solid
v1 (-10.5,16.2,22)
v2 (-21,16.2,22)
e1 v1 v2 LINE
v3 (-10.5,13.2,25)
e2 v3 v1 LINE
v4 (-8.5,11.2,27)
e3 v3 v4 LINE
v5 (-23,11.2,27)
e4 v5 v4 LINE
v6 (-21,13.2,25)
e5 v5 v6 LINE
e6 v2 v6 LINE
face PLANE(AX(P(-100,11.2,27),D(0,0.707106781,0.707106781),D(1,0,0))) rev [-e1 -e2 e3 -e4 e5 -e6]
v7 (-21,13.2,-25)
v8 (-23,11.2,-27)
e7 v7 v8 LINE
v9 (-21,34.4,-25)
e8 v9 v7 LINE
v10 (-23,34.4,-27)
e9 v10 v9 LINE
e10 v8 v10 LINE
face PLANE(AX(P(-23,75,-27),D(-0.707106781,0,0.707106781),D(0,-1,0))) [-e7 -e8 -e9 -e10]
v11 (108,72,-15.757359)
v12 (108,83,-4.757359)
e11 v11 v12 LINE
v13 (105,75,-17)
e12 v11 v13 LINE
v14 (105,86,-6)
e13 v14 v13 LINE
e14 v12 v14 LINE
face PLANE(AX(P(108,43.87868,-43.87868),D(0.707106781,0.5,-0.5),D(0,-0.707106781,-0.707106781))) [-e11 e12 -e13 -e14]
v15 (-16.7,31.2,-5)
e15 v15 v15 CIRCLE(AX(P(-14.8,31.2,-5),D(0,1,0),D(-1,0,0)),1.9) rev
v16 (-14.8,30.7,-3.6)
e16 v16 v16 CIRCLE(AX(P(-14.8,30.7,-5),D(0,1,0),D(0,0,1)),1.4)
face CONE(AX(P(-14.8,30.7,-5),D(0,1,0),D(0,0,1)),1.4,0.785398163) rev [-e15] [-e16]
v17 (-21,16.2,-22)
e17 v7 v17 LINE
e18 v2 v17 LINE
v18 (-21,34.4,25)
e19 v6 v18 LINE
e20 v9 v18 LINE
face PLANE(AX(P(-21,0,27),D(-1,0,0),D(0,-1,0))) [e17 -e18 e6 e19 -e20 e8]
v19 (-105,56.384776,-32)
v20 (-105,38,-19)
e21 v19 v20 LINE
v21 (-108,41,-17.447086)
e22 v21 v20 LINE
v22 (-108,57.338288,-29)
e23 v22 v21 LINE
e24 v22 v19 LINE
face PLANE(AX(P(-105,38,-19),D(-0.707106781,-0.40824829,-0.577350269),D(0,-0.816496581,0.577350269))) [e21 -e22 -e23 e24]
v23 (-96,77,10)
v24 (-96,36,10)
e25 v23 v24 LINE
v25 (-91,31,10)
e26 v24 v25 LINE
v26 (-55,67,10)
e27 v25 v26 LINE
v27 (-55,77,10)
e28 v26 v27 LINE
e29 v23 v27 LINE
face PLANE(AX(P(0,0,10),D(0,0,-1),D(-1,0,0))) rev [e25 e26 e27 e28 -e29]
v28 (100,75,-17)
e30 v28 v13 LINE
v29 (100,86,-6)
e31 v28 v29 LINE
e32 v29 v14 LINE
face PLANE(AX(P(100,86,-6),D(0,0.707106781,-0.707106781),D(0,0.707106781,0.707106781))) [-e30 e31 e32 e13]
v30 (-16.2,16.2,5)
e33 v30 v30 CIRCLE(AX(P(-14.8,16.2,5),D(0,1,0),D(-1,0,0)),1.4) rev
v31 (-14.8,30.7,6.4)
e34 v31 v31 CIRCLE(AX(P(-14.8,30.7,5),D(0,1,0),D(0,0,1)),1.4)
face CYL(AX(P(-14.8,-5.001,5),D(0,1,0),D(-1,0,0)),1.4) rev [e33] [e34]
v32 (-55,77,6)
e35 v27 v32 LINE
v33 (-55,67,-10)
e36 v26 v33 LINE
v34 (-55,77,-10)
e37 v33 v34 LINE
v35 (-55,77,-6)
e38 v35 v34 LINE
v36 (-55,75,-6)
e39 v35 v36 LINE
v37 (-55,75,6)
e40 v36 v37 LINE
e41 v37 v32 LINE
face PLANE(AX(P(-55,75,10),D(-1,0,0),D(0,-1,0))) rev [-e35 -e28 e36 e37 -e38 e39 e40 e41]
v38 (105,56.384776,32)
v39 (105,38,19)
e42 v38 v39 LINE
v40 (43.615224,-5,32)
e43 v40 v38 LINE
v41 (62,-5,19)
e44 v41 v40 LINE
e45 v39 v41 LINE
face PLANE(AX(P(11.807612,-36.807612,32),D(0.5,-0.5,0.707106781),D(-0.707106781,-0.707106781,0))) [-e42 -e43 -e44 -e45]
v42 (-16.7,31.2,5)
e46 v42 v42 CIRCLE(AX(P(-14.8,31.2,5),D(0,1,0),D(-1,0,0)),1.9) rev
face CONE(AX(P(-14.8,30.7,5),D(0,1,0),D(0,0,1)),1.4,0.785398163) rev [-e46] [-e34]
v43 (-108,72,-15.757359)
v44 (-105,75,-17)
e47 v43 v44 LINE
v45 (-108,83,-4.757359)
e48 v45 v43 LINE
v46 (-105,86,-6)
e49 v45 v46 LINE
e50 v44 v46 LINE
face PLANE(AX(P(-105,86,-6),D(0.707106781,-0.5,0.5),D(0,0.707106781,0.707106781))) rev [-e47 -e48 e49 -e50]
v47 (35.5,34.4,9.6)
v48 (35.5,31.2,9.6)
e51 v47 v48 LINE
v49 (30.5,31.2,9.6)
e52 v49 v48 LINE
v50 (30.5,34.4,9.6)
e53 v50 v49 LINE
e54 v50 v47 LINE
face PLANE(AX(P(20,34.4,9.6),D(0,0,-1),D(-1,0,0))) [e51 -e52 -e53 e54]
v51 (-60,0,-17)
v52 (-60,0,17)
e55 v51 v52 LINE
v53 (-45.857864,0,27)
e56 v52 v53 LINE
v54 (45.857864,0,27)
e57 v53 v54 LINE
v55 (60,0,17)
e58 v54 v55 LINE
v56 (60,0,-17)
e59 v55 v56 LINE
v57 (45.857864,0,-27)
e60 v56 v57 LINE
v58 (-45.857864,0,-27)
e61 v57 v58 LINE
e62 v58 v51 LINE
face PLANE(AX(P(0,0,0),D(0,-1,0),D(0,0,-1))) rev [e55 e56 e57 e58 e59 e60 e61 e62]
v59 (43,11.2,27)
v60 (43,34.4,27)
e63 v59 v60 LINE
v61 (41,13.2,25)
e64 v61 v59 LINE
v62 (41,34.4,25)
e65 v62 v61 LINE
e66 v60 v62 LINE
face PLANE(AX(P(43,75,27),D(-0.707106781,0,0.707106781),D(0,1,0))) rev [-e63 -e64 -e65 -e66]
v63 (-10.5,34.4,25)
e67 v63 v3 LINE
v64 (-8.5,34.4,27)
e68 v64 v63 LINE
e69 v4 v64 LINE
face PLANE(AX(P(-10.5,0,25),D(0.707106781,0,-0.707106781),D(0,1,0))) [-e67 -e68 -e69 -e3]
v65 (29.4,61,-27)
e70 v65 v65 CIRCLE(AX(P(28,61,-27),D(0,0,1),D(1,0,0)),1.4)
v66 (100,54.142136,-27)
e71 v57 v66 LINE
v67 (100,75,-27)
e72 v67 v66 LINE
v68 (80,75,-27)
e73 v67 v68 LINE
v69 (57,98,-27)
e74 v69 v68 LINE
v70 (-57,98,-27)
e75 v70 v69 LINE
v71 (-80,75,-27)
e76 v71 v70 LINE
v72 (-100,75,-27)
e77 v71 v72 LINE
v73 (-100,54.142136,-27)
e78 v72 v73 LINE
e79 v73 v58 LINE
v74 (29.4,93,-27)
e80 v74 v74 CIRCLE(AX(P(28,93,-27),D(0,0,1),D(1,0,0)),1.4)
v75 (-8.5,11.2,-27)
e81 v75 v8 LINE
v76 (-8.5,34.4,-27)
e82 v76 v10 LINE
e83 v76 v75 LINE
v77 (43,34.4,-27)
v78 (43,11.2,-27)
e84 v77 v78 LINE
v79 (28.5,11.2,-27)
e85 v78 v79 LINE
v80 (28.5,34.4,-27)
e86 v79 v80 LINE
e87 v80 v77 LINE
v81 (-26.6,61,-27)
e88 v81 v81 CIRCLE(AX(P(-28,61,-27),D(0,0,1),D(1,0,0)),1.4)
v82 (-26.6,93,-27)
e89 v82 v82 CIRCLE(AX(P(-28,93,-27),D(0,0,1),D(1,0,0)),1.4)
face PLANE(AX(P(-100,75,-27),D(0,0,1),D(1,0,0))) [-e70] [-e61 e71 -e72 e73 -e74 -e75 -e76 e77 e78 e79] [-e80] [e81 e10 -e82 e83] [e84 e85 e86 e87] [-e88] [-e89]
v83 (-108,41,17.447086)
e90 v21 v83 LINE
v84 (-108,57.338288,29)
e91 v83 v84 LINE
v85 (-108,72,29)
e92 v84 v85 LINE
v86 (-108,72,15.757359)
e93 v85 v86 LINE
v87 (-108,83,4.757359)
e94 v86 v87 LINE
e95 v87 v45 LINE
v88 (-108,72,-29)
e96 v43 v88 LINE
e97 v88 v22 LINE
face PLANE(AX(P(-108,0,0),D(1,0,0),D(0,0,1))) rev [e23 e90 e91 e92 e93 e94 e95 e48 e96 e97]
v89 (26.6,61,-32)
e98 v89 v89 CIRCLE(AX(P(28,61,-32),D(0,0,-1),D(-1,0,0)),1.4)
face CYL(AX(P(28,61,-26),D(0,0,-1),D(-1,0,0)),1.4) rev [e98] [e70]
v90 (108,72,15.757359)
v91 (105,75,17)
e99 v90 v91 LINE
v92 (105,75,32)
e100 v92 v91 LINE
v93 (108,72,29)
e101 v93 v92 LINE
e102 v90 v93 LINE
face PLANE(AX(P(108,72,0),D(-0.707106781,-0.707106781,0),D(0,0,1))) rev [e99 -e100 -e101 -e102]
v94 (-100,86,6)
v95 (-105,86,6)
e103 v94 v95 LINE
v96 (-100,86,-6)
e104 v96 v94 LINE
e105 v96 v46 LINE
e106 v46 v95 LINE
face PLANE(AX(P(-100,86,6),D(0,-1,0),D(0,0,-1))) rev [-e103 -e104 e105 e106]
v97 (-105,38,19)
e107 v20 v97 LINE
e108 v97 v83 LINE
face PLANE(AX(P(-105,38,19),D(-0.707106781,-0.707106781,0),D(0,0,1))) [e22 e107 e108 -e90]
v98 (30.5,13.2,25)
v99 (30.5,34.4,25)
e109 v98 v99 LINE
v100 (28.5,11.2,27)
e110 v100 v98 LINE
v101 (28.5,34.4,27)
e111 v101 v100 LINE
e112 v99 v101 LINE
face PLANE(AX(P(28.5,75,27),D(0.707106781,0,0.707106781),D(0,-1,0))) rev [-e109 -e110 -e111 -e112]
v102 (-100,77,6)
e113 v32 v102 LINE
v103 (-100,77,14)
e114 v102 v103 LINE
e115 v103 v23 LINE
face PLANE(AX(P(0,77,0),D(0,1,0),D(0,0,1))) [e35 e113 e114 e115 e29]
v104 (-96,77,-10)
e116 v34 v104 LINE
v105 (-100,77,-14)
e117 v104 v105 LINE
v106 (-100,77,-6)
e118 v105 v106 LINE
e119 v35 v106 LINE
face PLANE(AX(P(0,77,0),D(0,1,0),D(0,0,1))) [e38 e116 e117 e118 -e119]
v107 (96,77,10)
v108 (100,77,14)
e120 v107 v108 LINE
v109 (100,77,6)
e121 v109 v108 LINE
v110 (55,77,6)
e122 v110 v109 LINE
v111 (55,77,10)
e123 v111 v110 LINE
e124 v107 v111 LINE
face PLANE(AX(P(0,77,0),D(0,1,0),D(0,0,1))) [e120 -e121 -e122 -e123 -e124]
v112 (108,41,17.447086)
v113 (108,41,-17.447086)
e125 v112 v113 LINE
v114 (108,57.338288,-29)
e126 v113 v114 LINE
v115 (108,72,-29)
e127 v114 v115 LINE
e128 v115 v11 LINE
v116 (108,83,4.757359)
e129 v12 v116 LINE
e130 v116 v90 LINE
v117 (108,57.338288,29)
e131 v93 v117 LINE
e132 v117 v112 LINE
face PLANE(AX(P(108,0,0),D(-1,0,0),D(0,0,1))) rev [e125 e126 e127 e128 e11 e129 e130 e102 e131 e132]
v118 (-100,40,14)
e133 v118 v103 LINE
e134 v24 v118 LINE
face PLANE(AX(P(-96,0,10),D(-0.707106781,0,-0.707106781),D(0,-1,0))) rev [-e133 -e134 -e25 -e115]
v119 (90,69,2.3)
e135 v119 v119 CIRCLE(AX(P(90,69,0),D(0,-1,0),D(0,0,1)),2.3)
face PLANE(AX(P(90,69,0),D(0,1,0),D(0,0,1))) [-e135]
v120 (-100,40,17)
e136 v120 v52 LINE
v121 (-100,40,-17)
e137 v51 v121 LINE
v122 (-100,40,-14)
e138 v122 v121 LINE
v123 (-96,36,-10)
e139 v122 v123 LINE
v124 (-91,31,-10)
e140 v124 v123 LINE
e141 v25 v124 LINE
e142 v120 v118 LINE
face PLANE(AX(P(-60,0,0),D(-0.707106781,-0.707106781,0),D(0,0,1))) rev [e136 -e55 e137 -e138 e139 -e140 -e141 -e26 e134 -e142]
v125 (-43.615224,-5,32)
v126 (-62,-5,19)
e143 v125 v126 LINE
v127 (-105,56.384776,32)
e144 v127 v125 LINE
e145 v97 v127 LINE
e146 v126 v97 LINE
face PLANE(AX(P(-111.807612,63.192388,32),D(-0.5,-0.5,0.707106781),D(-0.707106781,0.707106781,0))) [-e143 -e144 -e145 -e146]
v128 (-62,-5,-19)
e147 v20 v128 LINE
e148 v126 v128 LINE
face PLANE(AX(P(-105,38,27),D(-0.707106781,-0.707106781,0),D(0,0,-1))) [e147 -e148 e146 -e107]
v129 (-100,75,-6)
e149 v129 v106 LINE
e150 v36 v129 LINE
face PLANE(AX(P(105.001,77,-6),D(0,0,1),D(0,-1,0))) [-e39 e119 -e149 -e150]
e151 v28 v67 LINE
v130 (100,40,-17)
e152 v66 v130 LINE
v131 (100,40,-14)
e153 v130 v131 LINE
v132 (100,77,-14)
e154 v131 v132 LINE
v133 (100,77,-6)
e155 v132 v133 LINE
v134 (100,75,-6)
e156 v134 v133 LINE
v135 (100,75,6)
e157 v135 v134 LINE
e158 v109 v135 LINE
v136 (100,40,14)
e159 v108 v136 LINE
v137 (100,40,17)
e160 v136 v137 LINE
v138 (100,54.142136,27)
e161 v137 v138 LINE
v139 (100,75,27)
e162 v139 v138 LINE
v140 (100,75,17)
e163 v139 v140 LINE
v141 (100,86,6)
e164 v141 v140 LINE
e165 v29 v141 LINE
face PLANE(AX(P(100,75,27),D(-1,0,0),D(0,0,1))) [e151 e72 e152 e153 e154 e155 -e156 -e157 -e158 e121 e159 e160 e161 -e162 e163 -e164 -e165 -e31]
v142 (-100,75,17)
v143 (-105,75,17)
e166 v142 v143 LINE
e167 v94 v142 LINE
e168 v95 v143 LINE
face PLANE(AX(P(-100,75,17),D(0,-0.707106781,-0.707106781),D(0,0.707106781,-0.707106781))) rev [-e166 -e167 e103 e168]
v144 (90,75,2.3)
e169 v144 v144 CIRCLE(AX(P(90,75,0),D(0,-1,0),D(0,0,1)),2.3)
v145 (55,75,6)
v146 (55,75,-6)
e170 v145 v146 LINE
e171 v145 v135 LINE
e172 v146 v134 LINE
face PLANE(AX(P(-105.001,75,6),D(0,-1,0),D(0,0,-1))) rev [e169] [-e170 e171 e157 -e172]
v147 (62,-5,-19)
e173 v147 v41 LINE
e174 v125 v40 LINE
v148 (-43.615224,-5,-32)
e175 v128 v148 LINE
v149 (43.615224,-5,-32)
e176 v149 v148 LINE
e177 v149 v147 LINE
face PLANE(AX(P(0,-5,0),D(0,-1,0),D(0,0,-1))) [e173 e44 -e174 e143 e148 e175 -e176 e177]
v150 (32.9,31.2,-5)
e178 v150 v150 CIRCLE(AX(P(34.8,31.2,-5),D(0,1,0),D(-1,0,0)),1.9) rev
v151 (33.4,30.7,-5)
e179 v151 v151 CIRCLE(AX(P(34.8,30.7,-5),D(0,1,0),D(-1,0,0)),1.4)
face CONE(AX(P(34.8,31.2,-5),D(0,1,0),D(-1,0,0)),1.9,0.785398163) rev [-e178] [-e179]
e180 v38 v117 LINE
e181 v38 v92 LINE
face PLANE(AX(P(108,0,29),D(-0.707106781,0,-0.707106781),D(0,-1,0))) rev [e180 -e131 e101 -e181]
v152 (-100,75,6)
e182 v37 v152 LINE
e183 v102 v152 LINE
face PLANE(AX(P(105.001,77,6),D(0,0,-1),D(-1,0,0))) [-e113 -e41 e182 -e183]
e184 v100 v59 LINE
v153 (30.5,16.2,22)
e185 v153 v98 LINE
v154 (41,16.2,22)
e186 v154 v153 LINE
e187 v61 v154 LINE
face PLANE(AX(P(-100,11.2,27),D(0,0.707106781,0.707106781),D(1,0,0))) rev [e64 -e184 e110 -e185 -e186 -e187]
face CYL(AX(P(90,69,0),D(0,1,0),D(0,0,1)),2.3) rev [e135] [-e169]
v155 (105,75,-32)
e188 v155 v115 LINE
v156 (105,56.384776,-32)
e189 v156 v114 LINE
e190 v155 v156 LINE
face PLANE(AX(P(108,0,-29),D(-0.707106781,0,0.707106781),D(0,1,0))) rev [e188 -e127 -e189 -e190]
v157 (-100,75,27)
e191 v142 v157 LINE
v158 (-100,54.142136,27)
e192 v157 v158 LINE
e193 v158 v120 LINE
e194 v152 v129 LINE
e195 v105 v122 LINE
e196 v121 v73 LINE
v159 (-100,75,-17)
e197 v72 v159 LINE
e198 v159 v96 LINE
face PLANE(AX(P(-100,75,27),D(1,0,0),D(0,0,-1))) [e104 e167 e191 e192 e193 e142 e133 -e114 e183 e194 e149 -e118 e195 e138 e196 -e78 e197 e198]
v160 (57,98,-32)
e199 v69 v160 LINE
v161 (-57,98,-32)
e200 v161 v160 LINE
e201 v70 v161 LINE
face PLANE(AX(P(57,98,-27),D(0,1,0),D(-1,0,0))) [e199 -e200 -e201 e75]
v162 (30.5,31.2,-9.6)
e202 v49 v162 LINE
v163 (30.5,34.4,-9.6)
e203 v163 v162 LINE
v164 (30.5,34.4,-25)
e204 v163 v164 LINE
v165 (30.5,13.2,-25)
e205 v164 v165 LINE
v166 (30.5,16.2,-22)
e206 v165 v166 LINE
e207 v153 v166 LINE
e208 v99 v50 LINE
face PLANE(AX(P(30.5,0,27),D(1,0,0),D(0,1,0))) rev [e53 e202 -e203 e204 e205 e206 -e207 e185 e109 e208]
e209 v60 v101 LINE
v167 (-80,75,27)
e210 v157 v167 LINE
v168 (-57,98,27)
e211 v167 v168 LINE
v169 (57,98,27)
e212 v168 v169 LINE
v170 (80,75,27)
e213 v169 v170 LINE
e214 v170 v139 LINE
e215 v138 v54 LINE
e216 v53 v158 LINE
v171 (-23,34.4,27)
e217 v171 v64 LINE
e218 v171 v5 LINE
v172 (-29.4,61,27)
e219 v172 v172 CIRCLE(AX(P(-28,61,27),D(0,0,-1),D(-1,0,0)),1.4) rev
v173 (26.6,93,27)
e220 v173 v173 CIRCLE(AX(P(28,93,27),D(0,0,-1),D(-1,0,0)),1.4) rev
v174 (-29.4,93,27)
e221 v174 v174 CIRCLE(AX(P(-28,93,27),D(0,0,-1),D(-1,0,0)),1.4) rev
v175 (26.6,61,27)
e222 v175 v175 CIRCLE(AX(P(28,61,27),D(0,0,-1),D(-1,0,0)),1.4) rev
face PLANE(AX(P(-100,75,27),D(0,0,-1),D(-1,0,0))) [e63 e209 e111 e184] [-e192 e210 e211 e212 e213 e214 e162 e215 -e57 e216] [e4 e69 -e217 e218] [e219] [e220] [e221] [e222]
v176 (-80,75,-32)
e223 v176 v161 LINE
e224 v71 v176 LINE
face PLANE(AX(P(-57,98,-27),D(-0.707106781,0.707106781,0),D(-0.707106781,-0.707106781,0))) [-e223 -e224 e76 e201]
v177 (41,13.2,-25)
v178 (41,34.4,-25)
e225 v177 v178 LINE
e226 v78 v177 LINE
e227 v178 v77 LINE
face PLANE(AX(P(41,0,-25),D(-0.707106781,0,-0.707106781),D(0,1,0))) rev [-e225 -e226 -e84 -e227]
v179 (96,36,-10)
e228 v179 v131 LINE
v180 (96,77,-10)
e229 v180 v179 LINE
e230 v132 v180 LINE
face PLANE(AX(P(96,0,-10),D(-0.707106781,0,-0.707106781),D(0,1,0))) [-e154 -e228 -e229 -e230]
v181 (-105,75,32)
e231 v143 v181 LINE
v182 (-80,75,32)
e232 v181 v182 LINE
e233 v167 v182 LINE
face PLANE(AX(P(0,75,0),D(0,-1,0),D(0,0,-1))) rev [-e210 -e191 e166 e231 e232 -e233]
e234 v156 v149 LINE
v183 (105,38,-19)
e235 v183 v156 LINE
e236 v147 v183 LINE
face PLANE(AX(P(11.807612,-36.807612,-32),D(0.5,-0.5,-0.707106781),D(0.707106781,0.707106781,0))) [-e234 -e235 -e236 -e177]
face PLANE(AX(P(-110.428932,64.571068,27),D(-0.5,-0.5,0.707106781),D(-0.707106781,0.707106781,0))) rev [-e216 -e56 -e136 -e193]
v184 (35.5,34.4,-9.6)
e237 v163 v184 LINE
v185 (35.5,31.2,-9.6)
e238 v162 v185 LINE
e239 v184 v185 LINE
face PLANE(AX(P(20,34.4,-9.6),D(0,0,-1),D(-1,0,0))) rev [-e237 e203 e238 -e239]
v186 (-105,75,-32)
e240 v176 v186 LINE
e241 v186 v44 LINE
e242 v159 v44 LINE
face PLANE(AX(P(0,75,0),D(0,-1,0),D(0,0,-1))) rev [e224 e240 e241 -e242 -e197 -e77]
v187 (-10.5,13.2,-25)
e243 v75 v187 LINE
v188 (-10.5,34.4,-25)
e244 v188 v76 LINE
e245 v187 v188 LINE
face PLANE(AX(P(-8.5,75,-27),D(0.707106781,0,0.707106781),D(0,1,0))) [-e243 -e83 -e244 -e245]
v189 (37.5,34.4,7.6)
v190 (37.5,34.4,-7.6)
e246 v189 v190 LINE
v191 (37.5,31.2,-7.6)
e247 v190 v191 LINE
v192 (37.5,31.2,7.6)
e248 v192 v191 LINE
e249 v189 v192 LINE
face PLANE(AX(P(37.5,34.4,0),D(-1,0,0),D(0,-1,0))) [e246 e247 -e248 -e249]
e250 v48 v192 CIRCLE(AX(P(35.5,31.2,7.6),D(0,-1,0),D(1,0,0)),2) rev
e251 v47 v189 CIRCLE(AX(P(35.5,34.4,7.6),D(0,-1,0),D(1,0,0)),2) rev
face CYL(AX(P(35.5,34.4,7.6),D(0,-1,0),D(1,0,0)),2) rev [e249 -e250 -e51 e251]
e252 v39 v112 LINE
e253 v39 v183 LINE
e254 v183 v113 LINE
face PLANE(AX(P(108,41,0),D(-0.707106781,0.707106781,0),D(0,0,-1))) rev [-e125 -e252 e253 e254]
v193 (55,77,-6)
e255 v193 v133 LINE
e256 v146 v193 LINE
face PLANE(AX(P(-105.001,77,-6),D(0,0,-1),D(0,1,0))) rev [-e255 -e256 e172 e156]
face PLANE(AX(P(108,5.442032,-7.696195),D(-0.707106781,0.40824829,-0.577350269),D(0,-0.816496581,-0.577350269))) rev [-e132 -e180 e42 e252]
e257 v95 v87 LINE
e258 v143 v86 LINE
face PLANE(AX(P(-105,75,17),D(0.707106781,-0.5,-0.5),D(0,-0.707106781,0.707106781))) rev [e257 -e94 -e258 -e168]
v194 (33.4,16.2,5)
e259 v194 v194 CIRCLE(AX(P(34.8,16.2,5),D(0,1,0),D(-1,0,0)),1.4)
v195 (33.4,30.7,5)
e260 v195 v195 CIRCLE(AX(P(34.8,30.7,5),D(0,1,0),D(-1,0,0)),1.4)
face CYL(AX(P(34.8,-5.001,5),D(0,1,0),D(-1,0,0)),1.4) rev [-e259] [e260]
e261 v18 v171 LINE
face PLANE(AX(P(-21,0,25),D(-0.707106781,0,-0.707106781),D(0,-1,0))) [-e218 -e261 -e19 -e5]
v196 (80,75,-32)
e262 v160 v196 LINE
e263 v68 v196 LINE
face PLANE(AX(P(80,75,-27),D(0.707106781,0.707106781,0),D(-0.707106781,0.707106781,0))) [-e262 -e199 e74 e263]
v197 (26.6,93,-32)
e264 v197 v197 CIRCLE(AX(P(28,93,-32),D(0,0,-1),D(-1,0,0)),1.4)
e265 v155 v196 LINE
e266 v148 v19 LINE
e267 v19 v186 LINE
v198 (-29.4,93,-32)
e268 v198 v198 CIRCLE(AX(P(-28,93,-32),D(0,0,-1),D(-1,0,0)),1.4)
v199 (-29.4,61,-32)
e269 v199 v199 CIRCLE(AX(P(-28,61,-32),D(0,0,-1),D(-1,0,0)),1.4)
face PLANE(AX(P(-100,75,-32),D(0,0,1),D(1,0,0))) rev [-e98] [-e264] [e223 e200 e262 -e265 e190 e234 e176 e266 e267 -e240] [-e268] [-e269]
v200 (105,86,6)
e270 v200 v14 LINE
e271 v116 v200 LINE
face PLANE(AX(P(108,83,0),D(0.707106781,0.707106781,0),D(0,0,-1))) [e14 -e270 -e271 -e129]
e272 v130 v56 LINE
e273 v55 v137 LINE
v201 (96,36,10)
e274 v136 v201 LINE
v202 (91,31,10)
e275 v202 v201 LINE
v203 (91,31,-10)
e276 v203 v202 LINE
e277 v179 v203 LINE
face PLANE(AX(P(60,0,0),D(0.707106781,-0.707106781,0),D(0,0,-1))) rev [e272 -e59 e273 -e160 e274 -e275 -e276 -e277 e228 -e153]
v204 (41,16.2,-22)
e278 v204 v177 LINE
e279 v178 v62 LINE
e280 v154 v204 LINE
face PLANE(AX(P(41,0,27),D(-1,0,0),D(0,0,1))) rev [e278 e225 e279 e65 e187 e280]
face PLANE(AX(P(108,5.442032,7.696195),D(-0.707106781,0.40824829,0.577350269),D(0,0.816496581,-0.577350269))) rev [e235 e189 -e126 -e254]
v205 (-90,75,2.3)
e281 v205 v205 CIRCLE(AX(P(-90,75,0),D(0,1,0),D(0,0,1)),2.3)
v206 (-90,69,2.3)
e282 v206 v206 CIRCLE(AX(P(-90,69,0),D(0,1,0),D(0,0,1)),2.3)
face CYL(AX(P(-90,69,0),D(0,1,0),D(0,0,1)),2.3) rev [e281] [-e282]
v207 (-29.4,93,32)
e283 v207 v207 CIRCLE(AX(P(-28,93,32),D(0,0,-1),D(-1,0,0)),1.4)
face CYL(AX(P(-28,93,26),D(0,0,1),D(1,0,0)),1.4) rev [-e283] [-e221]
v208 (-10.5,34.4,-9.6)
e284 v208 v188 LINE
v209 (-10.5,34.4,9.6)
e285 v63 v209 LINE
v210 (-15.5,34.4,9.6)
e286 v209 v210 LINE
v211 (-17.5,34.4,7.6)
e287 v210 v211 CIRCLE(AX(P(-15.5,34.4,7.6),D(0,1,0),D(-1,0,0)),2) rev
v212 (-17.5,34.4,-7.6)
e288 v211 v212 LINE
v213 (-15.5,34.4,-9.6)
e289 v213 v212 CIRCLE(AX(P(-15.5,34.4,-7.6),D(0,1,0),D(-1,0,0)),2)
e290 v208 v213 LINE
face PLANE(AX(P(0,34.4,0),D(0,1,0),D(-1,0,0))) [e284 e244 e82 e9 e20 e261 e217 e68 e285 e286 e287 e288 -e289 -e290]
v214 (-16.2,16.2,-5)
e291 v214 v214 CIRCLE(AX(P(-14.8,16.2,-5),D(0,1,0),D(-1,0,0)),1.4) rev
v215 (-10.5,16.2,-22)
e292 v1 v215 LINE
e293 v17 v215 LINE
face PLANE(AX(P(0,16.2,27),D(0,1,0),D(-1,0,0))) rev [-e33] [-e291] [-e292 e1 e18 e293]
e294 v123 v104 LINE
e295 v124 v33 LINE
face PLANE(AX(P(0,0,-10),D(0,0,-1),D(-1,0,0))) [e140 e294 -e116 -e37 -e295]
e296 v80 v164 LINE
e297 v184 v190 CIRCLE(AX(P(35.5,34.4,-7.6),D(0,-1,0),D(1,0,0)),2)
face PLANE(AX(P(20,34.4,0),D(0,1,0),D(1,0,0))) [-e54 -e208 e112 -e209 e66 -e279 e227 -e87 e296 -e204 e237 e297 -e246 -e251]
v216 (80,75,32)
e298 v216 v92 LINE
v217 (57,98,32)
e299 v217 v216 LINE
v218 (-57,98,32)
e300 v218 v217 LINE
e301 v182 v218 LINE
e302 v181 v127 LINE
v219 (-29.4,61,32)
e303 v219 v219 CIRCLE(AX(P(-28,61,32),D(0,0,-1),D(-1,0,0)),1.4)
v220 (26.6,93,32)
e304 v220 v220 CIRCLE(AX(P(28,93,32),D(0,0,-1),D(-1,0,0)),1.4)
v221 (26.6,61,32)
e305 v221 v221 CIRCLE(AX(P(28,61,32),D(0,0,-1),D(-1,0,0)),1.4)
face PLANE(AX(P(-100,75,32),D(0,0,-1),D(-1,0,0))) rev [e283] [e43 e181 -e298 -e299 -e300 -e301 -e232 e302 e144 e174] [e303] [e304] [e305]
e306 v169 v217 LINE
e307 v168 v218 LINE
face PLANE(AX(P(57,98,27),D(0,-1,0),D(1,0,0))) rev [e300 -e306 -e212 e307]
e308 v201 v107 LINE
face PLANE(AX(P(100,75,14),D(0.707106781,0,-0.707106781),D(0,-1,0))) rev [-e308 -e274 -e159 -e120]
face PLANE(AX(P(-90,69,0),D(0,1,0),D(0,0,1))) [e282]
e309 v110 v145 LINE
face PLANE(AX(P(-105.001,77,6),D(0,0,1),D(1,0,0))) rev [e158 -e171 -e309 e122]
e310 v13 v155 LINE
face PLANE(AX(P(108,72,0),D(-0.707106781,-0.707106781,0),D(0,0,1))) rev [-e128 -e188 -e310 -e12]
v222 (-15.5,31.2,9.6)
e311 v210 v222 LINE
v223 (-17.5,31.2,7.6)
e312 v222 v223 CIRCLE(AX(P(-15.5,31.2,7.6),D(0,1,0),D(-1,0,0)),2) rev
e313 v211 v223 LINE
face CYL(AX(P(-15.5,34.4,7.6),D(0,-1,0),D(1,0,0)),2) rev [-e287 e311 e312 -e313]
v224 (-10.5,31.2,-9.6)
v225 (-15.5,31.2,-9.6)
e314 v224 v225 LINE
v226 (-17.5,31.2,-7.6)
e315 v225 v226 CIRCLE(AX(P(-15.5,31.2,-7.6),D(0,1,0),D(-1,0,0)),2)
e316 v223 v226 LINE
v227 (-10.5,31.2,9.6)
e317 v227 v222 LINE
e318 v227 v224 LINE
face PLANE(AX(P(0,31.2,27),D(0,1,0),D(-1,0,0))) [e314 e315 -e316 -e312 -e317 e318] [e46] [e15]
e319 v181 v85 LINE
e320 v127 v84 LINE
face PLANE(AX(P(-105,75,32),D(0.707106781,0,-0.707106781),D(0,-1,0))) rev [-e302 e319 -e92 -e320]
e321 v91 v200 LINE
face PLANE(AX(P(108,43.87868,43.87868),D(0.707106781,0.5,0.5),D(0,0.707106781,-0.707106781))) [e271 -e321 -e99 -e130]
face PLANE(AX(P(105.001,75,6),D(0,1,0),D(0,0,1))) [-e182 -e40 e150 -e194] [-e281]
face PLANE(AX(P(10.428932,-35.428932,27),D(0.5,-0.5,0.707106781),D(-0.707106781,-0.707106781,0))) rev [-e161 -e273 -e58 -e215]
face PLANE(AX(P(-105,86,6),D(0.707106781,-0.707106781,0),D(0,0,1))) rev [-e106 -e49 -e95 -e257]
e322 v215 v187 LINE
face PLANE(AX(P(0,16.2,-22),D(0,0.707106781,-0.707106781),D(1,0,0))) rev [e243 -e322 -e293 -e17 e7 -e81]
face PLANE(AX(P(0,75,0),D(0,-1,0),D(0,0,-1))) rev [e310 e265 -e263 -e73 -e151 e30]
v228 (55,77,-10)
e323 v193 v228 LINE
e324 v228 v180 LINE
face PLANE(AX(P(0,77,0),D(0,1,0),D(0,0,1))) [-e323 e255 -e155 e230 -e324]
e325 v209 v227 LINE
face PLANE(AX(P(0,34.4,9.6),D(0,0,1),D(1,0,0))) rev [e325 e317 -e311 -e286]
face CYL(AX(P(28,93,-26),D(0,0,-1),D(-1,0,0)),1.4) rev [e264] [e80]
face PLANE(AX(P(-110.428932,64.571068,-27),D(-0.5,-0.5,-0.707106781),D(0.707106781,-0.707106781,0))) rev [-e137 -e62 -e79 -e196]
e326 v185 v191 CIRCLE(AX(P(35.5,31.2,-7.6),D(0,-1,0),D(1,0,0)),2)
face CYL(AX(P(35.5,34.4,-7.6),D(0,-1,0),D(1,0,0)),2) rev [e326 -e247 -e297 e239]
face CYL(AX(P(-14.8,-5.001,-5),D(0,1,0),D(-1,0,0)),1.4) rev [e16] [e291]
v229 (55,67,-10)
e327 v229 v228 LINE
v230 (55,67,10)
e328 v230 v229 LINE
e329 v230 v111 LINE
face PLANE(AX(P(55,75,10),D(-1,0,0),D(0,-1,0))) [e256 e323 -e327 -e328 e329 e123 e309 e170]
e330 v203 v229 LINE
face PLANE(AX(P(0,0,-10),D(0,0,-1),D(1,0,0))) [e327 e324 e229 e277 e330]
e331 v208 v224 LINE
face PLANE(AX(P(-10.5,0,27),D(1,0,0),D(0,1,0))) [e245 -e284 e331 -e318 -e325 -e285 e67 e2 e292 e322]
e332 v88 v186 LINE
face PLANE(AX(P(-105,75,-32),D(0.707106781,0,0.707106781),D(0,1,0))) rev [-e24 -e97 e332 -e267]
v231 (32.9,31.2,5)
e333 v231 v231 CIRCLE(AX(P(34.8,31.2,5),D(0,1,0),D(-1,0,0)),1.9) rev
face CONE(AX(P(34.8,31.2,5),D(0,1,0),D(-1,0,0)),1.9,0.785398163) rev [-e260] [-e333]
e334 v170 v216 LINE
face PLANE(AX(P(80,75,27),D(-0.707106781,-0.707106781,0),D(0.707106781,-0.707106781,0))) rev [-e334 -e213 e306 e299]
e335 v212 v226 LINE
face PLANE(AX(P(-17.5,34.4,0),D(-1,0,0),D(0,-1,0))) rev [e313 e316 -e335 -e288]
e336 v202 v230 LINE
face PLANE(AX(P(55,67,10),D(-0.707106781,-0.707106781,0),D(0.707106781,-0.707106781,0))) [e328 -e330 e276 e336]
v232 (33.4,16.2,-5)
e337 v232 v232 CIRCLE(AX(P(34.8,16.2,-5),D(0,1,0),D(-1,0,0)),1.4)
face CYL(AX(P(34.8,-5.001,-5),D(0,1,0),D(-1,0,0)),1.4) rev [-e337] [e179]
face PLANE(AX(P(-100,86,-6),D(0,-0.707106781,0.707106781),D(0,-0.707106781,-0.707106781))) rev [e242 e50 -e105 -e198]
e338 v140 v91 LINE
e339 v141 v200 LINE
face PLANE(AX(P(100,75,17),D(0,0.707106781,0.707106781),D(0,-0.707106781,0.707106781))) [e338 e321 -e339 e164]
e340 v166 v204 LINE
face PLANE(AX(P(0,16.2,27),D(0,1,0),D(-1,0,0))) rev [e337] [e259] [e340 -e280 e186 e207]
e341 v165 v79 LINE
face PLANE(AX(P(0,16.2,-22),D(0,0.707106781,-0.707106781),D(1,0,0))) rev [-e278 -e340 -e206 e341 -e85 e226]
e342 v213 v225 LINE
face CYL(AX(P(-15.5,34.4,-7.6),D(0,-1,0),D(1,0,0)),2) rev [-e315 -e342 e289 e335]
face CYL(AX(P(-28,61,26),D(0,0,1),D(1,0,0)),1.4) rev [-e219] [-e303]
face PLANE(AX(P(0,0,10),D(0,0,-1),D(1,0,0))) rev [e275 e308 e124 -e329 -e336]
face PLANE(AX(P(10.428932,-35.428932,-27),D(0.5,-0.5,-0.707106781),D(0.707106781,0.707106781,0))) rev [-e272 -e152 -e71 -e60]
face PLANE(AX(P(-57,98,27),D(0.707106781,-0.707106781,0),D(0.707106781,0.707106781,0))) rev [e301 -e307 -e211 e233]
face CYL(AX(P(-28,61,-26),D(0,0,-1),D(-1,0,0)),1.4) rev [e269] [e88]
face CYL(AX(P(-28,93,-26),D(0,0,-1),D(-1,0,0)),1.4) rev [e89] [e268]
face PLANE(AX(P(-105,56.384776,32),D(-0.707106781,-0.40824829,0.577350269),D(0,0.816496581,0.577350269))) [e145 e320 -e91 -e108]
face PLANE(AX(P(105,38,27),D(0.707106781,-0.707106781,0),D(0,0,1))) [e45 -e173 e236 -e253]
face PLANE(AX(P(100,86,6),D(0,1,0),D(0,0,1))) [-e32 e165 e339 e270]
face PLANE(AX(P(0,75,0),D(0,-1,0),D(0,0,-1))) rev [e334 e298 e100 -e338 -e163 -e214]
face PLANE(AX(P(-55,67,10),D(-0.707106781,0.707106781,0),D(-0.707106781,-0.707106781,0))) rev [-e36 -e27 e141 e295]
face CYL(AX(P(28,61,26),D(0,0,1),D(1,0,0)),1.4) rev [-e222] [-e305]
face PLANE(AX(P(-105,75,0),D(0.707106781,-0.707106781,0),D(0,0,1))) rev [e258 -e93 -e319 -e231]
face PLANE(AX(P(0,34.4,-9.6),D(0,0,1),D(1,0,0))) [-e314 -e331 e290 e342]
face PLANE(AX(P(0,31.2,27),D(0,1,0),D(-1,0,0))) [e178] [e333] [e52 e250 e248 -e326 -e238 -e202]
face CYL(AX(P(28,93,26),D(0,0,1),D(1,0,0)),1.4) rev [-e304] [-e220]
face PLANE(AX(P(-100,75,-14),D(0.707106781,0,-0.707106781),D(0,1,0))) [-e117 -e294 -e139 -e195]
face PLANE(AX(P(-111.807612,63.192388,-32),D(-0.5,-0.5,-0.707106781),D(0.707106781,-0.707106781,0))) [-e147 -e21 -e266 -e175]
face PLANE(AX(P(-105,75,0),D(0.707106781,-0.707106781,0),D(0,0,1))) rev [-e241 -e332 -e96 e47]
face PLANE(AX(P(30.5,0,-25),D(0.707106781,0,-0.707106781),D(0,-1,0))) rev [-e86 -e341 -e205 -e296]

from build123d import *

# Parameters (mm, degrees)
SKETCH1_W                  = 200
SKETCH1_H                  = 54
BOSS_EXTRUDE1_DEPTH        = 75
SHELL1_T                   = 5
BOSS_EXTRUDE2_DEPTH        = 5
BOSS_EXTRUDE3_DEPTH        = 5
SKETCH3_R                  = 1.4
CUT_EXTRUDE1_DEPTH         = 6
BOSS_EXTRUDE4_DEPTH        = 10
SKETCH9_W                  = 45
SKETCH9_H                  = 20
BOSS_EXTRUDE6_DEPTH        = 2
CUT_EXTRUDE2_REACH         = 231.462
SKETCH10_W                 = 12
SKETCH10_H                 = 2
SKETCH11_R                 = 2.3
CUT_EXTRUDE3_DEPTH         = 6
SKETCH13_W                 = 10.5
SKETCH13_H                 = 15
BOSS_EXTRUDE8_DEPTH        = 27
BOSS_EXTRUDE9_DEPTH        = 3.2
CUT_EXTRUDE4_REACH         = 130.496
SKETCH15_R                 = 1.4
CHAMFER8_SIZE              = 0.5
CHAMFER8_OF_MIRROR6_SIZE   = 0.5
CHAMFER3_SIZE              = 40
CHAMFER5_SIZE              = 43
CHAMFER9_SIZE              = 5
CHAMFER10_SIZE             = 2
CHAMFER11_SIZE             = 10
CHAMFER12_SIZE             = 13
CHAMFER13_SIZE             = 4
BOSS_EXTRUDE10_DEPTH       = 3
CHAMFER14_SIZE             = 3
CHAMFER14_OF_MIRROR28_SIZE = 3


# Some blends are built 0.0001 mm under size
with BuildPart() as part:
    # Sketch1 → Boss-Extrude1 (new body)
    with BuildSketch(Plane(origin=(0, 0, 0), x_dir=(1, 0, 0), z_dir=(0, 1, 0))):
        Rectangle(SKETCH1_W, SKETCH1_H)
    extrude(amount=BOSS_EXTRUDE1_DEPTH)

    # Shell1
    shell1_openings = [part.faces().sort_by_distance(p)[0] for p in [
        (0, 75, 0),
    ]]
    offset(amount=SHELL1_T, openings=shell1_openings, kind=Kind.INTERSECTION)

    # Sketch2 → Boss-Extrude2 (add)
    with BuildSketch(Plane(origin=(105, 0, 0), x_dir=(0, 0, -1), z_dir=(1, 0, 0))):
        Polygon((-17, 75), (-6, 86), (6, 86), (17, 75), align=None)
    boss_extrude2 = extrude(amount=-BOSS_EXTRUDE2_DEPTH)

    # Sketch4 → Boss-Extrude3 (add)
    with BuildSketch(Plane(origin=(0, 0, -32), x_dir=(-1, 0, 0), z_dir=(0, 0, -1))):
        Polygon((-80, 75), (-57, 98), (57, 98), (80, 75), align=None)
    boss_extrude3 = extrude(amount=-BOSS_EXTRUDE3_DEPTH)

    # Sketch3 → Cut-Extrude1 (cut)
    with BuildSketch(Plane(origin=(0, 0, -32), x_dir=(-1, 0, 0), z_dir=(0, 0, -1))):
        with Locations((-28, 93)):
            Circle(SKETCH3_R)
        with Locations((-28, 61)):
            Circle(SKETCH3_R)
        with Locations((28, 93)):
            Circle(SKETCH3_R)
        with Locations((28, 61)):
            Circle(SKETCH3_R)
    cut_extrude1 = extrude(amount=-CUT_EXTRUDE1_DEPTH, mode=Mode.SUBTRACT)

    # Mirror4: Boss-Extrude3, Cut-Extrude1 across plane
    add(boss_extrude3.mirror(Plane.XY))
    add(cut_extrude1.mirror(Plane.XY), mode=Mode.SUBTRACT)

    # Mirror5: Boss-Extrude2 across plane
    add(boss_extrude2.mirror(Plane(origin=(0, 0, 0), x_dir=(0, 0, 1), z_dir=(1, 0, 0))))

    # Sketch5 → Boss-Extrude4 (add, symmetric)
    with BuildSketch(Plane.XY):
        Polygon((-100, 75), (-55, 75), (-55, 67), (-100, 22), align=None)
    boss_extrude4 = extrude(amount=BOSS_EXTRUDE4_DEPTH, both=True)

    # Sketch9 → Boss-Extrude6 (add)
    with BuildSketch(Plane(origin=(0, 75, 0), x_dir=(1, 0, 0), z_dir=(0, 1, 0))):
        with Locations((-77.5, 0)):
            Rectangle(SKETCH9_W, SKETCH9_H)
    boss_extrude6 = extrude(amount=BOSS_EXTRUDE6_DEPTH)

    # Sketch10 → Cut-Extrude2 (cut, up to next)
    with BuildSketch(Plane(origin=(-100, 0, 0), x_dir=(0, 0, -1), z_dir=(1, 0, 0)), mode=Mode.PRIVATE) as cut_extrude2_sk1:
        with Locations((0, 76)):
            Rectangle(SKETCH10_W, SKETCH10_H)
    cut_extrude2_tool1 = extrude(cut_extrude2_sk1.sketch, amount=CUT_EXTRUDE2_REACH, mode=Mode.PRIVATE) & part.part
    cut_extrude2 = cut_extrude2_tool1.solids().sort_by_distance((-100, 76, 0))[0]
    add(cut_extrude2, mode=Mode.SUBTRACT)

    # Sketch11 → Cut-Extrude3 (cut)
    with BuildSketch(Plane(origin=(0, 75, 0), x_dir=(1, 0, 0), z_dir=(0, 1, 0))):
        with Locations(Location((-90, 0, 0), (0, 0, 270))):
            Circle(SKETCH11_R)
    cut_extrude3 = extrude(amount=-CUT_EXTRUDE3_DEPTH, mode=Mode.SUBTRACT)

    # Mirror24: Boss-Extrude4, Boss-Extrude6, Cut-Extrude2, Cut-Extrude3 across plane
    add(boss_extrude4.mirror(Plane(origin=(0, 0, 0), x_dir=(0, 0, 1), z_dir=(1, 0, 0))))
    add(boss_extrude6.mirror(Plane(origin=(0, 0, 0), x_dir=(0, 0, 1), z_dir=(1, 0, 0))))
    add(cut_extrude2.mirror(Plane(origin=(0, 0, 0), x_dir=(0, 0, 1), z_dir=(1, 0, 0))), mode=Mode.SUBTRACT)
    add(cut_extrude3.mirror(Plane(origin=(0, 0, 0), x_dir=(0, 0, 1), z_dir=(1, 0, 0))), mode=Mode.SUBTRACT)

    # Sketch13 → Boss-Extrude8 (add, symmetric)
    with BuildSketch(Plane.XY):
        with Locations((35.75, 23.7)):
            Rectangle(SKETCH13_W, SKETCH13_H)
        with Locations((-15.75, 23.7)):
            Rectangle(SKETCH13_W, SKETCH13_H)
    extrude(amount=BOSS_EXTRUDE8_DEPTH, both=True)

    # Sketch14 → Boss-Extrude9 (add)
    with BuildSketch(Plane(origin=(0, 31.2, 0), x_dir=(1, 0, 0), z_dir=(0, 1, 0))):
        with BuildLine():
            Line((-10.5, -27), (-10.5, -9.6))
            Line((-10.5, -9.6), (-15.5, -9.6))
            ThreePointArc((-15.5, -9.6), (-16.914213562, -9.014213562), (-17.5, -7.6))
            Line((-17.5, -7.6), (-17.5, 7.6))
            ThreePointArc((-17.5, 7.6), (-16.914213562, 9.014213562), (-15.5, 9.6))
            Line((-15.5, 9.6), (-10.5, 9.6))
            Line((-10.5, 9.6), (-10.5, 27))
            Line((-10.5, 27), (-21, 27))
            Line((-21, 27), (-21, -27))
            Line((-21, -27), (-10.5, -27))
        make_face()
    boss_extrude9 = extrude(amount=BOSS_EXTRUDE9_DEPTH)

    # Sketch15 → Cut-Extrude4 (cut, up to next)
    with BuildSketch(Plane(origin=(0, 31.2, 0), x_dir=(1, 0, 0), z_dir=(0, 1, 0)), mode=Mode.PRIVATE) as cut_extrude4_sk1:
        with Locations(Location((-14.8, 5, 0), (0, 0, 180))):
            Circle(SKETCH15_R)
    cut_extrude4_tool1 = extrude(cut_extrude4_sk1.sketch, amount=-CUT_EXTRUDE4_REACH, mode=Mode.PRIVATE) & part.part
    # Sketch15 → Cut-Extrude4 (cut, up to next)
    with BuildSketch(Plane(origin=(0, 31.2, 0), x_dir=(1, 0, 0), z_dir=(0, 1, 0)), mode=Mode.PRIVATE) as cut_extrude4_sk2:
        with Locations(Location((-14.8, -5, 0), (0, 0, 180))):
            Circle(SKETCH15_R)
    cut_extrude4_tool2 = extrude(cut_extrude4_sk2.sketch, amount=-CUT_EXTRUDE4_REACH, mode=Mode.PRIVATE) & part.part
    cut_extrude4_1 = cut_extrude4_tool1.solids().sort_by_distance((-14.8, 31.2, -5))[0]
    add(cut_extrude4_1, mode=Mode.SUBTRACT)
    cut_extrude4_2 = cut_extrude4_tool2.solids().sort_by_distance((-14.8, 31.2, 5))[0]
    add(cut_extrude4_2, mode=Mode.SUBTRACT)
    cut_extrude4 = cut_extrude4_1 + cut_extrude4_2  # Cut-Extrude4 as one shape, for the pattern or mirror that repeats it

    # Chamfer8
    chamfer8_edges = [part.edges().sort_by_distance(p)[0] for p in [
        (-13.4, 31.2, -5),
        (-13.4, 31.2, 5),
    ]]
    chamfer(chamfer8_edges, length=CHAMFER8_SIZE)

    # Mirror6: Boss-Extrude9, Cut-Extrude4 across plane
    add(boss_extrude9.mirror(Plane(origin=(10, 0, 0), x_dir=(0, 0, 1), z_dir=(1, 0, 0))))
    add(cut_extrude4.mirror(Plane(origin=(10, 0, 0), x_dir=(0, 0, 1), z_dir=(1, 0, 0))), mode=Mode.SUBTRACT)

    # Chamfer8 of Mirror6
    chamfer8_of_mirror6_edges = [part.edges().sort_by_distance(p)[0] for p in [
        (33.4, 31.2, -5),
        (33.4, 31.2, 5),
    ]]
    chamfer(chamfer8_of_mirror6_edges, length=CHAMFER8_OF_MIRROR6_SIZE)

    # Chamfer3
    # the kernel refuses this chamfer: 40 mm, written as the material it adds along each edge
    with BuildSketch(Plane(origin=(100, 0, 27), x_dir=(0.027495876610586317, 0.9996219169112968, 0), z_dir=(0, 0, -1)), Plane(origin=(-100, 0, -27), x_dir=(-0.027495876610586317, 0.9996219169112968, 0), z_dir=(0, 0, 1))) as chamfer3_piece_1:
        Polygon((CHAMFER3_SIZE * 0.999621916911, -CHAMFER3_SIZE * 0.0274958766106), (-CHAMFER3_SIZE * 0.0274958766106, -CHAMFER3_SIZE * 0.999621916911), (0, 0), align=None)
    extrude(amount=54)

    # Chamfer5
    chamfer5_edges = [part.edges().sort_by_distance(p)[0] for p in [
        (-105, -5, 0),
        (105, -5, 0),
    ]]
    chamfer(chamfer5_edges, length=CHAMFER5_SIZE)

    # Chamfer9
    chamfer9_edges = [part.edges().sort_by_distance(p)[0] for p in [
        (35.75, 16.2, -27),
        (35.75, 16.2, 27),
        (-15.75, 16.2, -27),
        (-15.75, 16.2, 27),
    ]]
    chamfer(chamfer9_edges, length=CHAMFER9_SIZE)

    # Chamfer10
    chamfer10_edges = [part.edges().sort_by_distance(p)[0] for p in [
        (30.5, 22.8, -27),
        (41, 22.8, -27),
        (30.5, 22.8, 27),
        (41, 22.8, 27),
        (-10.5, 22.8, 27),
        (-21, 22.8, 27),
        (-10.5, 22.8, -27),
        (-21, 22.8, -27),
    ]]
    chamfer(chamfer10_edges, length=CHAMFER10_SIZE)

    # Chamfer11
    chamfer11_edges = [part.edges().sort_by_distance(p)[0] for p in [
        (-80, 20, -27),
        (80, 20, -27),
        (-80, 20, 27),
        (80, 20, 27),
    ]]
    chamfer(chamfer11_edges, length=CHAMFER11_SIZE)

    # Chamfer12
    chamfer12_edges = [part.edges().sort_by_distance(p)[0] for p in [
        (-83.5, 16.5, -32),
        (83.5, 16.5, -32),
        (-83.5, 16.5, 32),
        (83.5, 16.5, 32),
    ]]
    chamfer(chamfer12_edges, length=CHAMFER12_SIZE)

    # Chamfer13
    chamfer13_edges = [part.edges().sort_by_distance(p)[0] for p in [
        (-100, 58.5, -10),
        (-100, 58.5, 10),
        (100, 58.5, 10),
        (100, 58.5, -10),
    ]]
    chamfer(chamfer13_edges, length=CHAMFER13_SIZE)

    # Sketch16 → Boss-Extrude10 (add)
    with BuildSketch(Plane(origin=(105, 0, 0), x_dir=(0, 0, -1), z_dir=(1, 0, 0))):
        Polygon((-19, 38), (19, 38), (32, 56.384776311), (32, 75), (17, 75), (6, 86), (-6, 86), (-17, 75), (-32, 75), (-32, 56.384776311), align=None)
    boss_extrude10 = extrude(amount=BOSS_EXTRUDE10_DEPTH)

    # Chamfer14
    chamfer14_edges = [part.edges().sort_by_distance(p)[0] for p in [
        (108, 65.692388155, 32),
        (108, 75, 24.5),
        (108, 80.5, 11.5),
        (108, 86, 0),
        (108, 80.5, -11.5),
        (108, 75, -24.5),
        (108, 65.692388155, -32),
        (108, 47.192388155, -25.5),
        (108, 38, 0),
        (108, 47.192388155, 25.5),
    ]]
    chamfer(chamfer14_edges, length=CHAMFER14_SIZE - 0.0001)  # a hair under: the kernel refuses the full size

    # Mirror28: Boss-Extrude10 across plane
    add(boss_extrude10.mirror(Plane(origin=(0, 0, 0), x_dir=(0, 0, 1), z_dir=(1, 0, 0))))

    # Chamfer14 of Mirror28
    chamfer14_of_mirror28_edges = [part.edges().sort_by_distance(p)[0] for p in [
        (-108, 65.692388155, 32),
        (-108, 75, 24.5),
        (-108, 80.5, 11.5),
        (-108, 86, 0),
        (-108, 80.5, -11.5),
        (-108, 75, -24.5),
        (-108, 65.692388155, -32),
        (-108, 47.192388155, -25.5),
        (-108, 38, 0),
        (-108, 47.192388155, 25.5),
    ]]
    chamfer(chamfer14_of_mirror28_edges, length=CHAMFER14_OF_MIRROR28_SIZE - 0.0001)  # a hair under: the kernel refuses the full size


solid = part.part
